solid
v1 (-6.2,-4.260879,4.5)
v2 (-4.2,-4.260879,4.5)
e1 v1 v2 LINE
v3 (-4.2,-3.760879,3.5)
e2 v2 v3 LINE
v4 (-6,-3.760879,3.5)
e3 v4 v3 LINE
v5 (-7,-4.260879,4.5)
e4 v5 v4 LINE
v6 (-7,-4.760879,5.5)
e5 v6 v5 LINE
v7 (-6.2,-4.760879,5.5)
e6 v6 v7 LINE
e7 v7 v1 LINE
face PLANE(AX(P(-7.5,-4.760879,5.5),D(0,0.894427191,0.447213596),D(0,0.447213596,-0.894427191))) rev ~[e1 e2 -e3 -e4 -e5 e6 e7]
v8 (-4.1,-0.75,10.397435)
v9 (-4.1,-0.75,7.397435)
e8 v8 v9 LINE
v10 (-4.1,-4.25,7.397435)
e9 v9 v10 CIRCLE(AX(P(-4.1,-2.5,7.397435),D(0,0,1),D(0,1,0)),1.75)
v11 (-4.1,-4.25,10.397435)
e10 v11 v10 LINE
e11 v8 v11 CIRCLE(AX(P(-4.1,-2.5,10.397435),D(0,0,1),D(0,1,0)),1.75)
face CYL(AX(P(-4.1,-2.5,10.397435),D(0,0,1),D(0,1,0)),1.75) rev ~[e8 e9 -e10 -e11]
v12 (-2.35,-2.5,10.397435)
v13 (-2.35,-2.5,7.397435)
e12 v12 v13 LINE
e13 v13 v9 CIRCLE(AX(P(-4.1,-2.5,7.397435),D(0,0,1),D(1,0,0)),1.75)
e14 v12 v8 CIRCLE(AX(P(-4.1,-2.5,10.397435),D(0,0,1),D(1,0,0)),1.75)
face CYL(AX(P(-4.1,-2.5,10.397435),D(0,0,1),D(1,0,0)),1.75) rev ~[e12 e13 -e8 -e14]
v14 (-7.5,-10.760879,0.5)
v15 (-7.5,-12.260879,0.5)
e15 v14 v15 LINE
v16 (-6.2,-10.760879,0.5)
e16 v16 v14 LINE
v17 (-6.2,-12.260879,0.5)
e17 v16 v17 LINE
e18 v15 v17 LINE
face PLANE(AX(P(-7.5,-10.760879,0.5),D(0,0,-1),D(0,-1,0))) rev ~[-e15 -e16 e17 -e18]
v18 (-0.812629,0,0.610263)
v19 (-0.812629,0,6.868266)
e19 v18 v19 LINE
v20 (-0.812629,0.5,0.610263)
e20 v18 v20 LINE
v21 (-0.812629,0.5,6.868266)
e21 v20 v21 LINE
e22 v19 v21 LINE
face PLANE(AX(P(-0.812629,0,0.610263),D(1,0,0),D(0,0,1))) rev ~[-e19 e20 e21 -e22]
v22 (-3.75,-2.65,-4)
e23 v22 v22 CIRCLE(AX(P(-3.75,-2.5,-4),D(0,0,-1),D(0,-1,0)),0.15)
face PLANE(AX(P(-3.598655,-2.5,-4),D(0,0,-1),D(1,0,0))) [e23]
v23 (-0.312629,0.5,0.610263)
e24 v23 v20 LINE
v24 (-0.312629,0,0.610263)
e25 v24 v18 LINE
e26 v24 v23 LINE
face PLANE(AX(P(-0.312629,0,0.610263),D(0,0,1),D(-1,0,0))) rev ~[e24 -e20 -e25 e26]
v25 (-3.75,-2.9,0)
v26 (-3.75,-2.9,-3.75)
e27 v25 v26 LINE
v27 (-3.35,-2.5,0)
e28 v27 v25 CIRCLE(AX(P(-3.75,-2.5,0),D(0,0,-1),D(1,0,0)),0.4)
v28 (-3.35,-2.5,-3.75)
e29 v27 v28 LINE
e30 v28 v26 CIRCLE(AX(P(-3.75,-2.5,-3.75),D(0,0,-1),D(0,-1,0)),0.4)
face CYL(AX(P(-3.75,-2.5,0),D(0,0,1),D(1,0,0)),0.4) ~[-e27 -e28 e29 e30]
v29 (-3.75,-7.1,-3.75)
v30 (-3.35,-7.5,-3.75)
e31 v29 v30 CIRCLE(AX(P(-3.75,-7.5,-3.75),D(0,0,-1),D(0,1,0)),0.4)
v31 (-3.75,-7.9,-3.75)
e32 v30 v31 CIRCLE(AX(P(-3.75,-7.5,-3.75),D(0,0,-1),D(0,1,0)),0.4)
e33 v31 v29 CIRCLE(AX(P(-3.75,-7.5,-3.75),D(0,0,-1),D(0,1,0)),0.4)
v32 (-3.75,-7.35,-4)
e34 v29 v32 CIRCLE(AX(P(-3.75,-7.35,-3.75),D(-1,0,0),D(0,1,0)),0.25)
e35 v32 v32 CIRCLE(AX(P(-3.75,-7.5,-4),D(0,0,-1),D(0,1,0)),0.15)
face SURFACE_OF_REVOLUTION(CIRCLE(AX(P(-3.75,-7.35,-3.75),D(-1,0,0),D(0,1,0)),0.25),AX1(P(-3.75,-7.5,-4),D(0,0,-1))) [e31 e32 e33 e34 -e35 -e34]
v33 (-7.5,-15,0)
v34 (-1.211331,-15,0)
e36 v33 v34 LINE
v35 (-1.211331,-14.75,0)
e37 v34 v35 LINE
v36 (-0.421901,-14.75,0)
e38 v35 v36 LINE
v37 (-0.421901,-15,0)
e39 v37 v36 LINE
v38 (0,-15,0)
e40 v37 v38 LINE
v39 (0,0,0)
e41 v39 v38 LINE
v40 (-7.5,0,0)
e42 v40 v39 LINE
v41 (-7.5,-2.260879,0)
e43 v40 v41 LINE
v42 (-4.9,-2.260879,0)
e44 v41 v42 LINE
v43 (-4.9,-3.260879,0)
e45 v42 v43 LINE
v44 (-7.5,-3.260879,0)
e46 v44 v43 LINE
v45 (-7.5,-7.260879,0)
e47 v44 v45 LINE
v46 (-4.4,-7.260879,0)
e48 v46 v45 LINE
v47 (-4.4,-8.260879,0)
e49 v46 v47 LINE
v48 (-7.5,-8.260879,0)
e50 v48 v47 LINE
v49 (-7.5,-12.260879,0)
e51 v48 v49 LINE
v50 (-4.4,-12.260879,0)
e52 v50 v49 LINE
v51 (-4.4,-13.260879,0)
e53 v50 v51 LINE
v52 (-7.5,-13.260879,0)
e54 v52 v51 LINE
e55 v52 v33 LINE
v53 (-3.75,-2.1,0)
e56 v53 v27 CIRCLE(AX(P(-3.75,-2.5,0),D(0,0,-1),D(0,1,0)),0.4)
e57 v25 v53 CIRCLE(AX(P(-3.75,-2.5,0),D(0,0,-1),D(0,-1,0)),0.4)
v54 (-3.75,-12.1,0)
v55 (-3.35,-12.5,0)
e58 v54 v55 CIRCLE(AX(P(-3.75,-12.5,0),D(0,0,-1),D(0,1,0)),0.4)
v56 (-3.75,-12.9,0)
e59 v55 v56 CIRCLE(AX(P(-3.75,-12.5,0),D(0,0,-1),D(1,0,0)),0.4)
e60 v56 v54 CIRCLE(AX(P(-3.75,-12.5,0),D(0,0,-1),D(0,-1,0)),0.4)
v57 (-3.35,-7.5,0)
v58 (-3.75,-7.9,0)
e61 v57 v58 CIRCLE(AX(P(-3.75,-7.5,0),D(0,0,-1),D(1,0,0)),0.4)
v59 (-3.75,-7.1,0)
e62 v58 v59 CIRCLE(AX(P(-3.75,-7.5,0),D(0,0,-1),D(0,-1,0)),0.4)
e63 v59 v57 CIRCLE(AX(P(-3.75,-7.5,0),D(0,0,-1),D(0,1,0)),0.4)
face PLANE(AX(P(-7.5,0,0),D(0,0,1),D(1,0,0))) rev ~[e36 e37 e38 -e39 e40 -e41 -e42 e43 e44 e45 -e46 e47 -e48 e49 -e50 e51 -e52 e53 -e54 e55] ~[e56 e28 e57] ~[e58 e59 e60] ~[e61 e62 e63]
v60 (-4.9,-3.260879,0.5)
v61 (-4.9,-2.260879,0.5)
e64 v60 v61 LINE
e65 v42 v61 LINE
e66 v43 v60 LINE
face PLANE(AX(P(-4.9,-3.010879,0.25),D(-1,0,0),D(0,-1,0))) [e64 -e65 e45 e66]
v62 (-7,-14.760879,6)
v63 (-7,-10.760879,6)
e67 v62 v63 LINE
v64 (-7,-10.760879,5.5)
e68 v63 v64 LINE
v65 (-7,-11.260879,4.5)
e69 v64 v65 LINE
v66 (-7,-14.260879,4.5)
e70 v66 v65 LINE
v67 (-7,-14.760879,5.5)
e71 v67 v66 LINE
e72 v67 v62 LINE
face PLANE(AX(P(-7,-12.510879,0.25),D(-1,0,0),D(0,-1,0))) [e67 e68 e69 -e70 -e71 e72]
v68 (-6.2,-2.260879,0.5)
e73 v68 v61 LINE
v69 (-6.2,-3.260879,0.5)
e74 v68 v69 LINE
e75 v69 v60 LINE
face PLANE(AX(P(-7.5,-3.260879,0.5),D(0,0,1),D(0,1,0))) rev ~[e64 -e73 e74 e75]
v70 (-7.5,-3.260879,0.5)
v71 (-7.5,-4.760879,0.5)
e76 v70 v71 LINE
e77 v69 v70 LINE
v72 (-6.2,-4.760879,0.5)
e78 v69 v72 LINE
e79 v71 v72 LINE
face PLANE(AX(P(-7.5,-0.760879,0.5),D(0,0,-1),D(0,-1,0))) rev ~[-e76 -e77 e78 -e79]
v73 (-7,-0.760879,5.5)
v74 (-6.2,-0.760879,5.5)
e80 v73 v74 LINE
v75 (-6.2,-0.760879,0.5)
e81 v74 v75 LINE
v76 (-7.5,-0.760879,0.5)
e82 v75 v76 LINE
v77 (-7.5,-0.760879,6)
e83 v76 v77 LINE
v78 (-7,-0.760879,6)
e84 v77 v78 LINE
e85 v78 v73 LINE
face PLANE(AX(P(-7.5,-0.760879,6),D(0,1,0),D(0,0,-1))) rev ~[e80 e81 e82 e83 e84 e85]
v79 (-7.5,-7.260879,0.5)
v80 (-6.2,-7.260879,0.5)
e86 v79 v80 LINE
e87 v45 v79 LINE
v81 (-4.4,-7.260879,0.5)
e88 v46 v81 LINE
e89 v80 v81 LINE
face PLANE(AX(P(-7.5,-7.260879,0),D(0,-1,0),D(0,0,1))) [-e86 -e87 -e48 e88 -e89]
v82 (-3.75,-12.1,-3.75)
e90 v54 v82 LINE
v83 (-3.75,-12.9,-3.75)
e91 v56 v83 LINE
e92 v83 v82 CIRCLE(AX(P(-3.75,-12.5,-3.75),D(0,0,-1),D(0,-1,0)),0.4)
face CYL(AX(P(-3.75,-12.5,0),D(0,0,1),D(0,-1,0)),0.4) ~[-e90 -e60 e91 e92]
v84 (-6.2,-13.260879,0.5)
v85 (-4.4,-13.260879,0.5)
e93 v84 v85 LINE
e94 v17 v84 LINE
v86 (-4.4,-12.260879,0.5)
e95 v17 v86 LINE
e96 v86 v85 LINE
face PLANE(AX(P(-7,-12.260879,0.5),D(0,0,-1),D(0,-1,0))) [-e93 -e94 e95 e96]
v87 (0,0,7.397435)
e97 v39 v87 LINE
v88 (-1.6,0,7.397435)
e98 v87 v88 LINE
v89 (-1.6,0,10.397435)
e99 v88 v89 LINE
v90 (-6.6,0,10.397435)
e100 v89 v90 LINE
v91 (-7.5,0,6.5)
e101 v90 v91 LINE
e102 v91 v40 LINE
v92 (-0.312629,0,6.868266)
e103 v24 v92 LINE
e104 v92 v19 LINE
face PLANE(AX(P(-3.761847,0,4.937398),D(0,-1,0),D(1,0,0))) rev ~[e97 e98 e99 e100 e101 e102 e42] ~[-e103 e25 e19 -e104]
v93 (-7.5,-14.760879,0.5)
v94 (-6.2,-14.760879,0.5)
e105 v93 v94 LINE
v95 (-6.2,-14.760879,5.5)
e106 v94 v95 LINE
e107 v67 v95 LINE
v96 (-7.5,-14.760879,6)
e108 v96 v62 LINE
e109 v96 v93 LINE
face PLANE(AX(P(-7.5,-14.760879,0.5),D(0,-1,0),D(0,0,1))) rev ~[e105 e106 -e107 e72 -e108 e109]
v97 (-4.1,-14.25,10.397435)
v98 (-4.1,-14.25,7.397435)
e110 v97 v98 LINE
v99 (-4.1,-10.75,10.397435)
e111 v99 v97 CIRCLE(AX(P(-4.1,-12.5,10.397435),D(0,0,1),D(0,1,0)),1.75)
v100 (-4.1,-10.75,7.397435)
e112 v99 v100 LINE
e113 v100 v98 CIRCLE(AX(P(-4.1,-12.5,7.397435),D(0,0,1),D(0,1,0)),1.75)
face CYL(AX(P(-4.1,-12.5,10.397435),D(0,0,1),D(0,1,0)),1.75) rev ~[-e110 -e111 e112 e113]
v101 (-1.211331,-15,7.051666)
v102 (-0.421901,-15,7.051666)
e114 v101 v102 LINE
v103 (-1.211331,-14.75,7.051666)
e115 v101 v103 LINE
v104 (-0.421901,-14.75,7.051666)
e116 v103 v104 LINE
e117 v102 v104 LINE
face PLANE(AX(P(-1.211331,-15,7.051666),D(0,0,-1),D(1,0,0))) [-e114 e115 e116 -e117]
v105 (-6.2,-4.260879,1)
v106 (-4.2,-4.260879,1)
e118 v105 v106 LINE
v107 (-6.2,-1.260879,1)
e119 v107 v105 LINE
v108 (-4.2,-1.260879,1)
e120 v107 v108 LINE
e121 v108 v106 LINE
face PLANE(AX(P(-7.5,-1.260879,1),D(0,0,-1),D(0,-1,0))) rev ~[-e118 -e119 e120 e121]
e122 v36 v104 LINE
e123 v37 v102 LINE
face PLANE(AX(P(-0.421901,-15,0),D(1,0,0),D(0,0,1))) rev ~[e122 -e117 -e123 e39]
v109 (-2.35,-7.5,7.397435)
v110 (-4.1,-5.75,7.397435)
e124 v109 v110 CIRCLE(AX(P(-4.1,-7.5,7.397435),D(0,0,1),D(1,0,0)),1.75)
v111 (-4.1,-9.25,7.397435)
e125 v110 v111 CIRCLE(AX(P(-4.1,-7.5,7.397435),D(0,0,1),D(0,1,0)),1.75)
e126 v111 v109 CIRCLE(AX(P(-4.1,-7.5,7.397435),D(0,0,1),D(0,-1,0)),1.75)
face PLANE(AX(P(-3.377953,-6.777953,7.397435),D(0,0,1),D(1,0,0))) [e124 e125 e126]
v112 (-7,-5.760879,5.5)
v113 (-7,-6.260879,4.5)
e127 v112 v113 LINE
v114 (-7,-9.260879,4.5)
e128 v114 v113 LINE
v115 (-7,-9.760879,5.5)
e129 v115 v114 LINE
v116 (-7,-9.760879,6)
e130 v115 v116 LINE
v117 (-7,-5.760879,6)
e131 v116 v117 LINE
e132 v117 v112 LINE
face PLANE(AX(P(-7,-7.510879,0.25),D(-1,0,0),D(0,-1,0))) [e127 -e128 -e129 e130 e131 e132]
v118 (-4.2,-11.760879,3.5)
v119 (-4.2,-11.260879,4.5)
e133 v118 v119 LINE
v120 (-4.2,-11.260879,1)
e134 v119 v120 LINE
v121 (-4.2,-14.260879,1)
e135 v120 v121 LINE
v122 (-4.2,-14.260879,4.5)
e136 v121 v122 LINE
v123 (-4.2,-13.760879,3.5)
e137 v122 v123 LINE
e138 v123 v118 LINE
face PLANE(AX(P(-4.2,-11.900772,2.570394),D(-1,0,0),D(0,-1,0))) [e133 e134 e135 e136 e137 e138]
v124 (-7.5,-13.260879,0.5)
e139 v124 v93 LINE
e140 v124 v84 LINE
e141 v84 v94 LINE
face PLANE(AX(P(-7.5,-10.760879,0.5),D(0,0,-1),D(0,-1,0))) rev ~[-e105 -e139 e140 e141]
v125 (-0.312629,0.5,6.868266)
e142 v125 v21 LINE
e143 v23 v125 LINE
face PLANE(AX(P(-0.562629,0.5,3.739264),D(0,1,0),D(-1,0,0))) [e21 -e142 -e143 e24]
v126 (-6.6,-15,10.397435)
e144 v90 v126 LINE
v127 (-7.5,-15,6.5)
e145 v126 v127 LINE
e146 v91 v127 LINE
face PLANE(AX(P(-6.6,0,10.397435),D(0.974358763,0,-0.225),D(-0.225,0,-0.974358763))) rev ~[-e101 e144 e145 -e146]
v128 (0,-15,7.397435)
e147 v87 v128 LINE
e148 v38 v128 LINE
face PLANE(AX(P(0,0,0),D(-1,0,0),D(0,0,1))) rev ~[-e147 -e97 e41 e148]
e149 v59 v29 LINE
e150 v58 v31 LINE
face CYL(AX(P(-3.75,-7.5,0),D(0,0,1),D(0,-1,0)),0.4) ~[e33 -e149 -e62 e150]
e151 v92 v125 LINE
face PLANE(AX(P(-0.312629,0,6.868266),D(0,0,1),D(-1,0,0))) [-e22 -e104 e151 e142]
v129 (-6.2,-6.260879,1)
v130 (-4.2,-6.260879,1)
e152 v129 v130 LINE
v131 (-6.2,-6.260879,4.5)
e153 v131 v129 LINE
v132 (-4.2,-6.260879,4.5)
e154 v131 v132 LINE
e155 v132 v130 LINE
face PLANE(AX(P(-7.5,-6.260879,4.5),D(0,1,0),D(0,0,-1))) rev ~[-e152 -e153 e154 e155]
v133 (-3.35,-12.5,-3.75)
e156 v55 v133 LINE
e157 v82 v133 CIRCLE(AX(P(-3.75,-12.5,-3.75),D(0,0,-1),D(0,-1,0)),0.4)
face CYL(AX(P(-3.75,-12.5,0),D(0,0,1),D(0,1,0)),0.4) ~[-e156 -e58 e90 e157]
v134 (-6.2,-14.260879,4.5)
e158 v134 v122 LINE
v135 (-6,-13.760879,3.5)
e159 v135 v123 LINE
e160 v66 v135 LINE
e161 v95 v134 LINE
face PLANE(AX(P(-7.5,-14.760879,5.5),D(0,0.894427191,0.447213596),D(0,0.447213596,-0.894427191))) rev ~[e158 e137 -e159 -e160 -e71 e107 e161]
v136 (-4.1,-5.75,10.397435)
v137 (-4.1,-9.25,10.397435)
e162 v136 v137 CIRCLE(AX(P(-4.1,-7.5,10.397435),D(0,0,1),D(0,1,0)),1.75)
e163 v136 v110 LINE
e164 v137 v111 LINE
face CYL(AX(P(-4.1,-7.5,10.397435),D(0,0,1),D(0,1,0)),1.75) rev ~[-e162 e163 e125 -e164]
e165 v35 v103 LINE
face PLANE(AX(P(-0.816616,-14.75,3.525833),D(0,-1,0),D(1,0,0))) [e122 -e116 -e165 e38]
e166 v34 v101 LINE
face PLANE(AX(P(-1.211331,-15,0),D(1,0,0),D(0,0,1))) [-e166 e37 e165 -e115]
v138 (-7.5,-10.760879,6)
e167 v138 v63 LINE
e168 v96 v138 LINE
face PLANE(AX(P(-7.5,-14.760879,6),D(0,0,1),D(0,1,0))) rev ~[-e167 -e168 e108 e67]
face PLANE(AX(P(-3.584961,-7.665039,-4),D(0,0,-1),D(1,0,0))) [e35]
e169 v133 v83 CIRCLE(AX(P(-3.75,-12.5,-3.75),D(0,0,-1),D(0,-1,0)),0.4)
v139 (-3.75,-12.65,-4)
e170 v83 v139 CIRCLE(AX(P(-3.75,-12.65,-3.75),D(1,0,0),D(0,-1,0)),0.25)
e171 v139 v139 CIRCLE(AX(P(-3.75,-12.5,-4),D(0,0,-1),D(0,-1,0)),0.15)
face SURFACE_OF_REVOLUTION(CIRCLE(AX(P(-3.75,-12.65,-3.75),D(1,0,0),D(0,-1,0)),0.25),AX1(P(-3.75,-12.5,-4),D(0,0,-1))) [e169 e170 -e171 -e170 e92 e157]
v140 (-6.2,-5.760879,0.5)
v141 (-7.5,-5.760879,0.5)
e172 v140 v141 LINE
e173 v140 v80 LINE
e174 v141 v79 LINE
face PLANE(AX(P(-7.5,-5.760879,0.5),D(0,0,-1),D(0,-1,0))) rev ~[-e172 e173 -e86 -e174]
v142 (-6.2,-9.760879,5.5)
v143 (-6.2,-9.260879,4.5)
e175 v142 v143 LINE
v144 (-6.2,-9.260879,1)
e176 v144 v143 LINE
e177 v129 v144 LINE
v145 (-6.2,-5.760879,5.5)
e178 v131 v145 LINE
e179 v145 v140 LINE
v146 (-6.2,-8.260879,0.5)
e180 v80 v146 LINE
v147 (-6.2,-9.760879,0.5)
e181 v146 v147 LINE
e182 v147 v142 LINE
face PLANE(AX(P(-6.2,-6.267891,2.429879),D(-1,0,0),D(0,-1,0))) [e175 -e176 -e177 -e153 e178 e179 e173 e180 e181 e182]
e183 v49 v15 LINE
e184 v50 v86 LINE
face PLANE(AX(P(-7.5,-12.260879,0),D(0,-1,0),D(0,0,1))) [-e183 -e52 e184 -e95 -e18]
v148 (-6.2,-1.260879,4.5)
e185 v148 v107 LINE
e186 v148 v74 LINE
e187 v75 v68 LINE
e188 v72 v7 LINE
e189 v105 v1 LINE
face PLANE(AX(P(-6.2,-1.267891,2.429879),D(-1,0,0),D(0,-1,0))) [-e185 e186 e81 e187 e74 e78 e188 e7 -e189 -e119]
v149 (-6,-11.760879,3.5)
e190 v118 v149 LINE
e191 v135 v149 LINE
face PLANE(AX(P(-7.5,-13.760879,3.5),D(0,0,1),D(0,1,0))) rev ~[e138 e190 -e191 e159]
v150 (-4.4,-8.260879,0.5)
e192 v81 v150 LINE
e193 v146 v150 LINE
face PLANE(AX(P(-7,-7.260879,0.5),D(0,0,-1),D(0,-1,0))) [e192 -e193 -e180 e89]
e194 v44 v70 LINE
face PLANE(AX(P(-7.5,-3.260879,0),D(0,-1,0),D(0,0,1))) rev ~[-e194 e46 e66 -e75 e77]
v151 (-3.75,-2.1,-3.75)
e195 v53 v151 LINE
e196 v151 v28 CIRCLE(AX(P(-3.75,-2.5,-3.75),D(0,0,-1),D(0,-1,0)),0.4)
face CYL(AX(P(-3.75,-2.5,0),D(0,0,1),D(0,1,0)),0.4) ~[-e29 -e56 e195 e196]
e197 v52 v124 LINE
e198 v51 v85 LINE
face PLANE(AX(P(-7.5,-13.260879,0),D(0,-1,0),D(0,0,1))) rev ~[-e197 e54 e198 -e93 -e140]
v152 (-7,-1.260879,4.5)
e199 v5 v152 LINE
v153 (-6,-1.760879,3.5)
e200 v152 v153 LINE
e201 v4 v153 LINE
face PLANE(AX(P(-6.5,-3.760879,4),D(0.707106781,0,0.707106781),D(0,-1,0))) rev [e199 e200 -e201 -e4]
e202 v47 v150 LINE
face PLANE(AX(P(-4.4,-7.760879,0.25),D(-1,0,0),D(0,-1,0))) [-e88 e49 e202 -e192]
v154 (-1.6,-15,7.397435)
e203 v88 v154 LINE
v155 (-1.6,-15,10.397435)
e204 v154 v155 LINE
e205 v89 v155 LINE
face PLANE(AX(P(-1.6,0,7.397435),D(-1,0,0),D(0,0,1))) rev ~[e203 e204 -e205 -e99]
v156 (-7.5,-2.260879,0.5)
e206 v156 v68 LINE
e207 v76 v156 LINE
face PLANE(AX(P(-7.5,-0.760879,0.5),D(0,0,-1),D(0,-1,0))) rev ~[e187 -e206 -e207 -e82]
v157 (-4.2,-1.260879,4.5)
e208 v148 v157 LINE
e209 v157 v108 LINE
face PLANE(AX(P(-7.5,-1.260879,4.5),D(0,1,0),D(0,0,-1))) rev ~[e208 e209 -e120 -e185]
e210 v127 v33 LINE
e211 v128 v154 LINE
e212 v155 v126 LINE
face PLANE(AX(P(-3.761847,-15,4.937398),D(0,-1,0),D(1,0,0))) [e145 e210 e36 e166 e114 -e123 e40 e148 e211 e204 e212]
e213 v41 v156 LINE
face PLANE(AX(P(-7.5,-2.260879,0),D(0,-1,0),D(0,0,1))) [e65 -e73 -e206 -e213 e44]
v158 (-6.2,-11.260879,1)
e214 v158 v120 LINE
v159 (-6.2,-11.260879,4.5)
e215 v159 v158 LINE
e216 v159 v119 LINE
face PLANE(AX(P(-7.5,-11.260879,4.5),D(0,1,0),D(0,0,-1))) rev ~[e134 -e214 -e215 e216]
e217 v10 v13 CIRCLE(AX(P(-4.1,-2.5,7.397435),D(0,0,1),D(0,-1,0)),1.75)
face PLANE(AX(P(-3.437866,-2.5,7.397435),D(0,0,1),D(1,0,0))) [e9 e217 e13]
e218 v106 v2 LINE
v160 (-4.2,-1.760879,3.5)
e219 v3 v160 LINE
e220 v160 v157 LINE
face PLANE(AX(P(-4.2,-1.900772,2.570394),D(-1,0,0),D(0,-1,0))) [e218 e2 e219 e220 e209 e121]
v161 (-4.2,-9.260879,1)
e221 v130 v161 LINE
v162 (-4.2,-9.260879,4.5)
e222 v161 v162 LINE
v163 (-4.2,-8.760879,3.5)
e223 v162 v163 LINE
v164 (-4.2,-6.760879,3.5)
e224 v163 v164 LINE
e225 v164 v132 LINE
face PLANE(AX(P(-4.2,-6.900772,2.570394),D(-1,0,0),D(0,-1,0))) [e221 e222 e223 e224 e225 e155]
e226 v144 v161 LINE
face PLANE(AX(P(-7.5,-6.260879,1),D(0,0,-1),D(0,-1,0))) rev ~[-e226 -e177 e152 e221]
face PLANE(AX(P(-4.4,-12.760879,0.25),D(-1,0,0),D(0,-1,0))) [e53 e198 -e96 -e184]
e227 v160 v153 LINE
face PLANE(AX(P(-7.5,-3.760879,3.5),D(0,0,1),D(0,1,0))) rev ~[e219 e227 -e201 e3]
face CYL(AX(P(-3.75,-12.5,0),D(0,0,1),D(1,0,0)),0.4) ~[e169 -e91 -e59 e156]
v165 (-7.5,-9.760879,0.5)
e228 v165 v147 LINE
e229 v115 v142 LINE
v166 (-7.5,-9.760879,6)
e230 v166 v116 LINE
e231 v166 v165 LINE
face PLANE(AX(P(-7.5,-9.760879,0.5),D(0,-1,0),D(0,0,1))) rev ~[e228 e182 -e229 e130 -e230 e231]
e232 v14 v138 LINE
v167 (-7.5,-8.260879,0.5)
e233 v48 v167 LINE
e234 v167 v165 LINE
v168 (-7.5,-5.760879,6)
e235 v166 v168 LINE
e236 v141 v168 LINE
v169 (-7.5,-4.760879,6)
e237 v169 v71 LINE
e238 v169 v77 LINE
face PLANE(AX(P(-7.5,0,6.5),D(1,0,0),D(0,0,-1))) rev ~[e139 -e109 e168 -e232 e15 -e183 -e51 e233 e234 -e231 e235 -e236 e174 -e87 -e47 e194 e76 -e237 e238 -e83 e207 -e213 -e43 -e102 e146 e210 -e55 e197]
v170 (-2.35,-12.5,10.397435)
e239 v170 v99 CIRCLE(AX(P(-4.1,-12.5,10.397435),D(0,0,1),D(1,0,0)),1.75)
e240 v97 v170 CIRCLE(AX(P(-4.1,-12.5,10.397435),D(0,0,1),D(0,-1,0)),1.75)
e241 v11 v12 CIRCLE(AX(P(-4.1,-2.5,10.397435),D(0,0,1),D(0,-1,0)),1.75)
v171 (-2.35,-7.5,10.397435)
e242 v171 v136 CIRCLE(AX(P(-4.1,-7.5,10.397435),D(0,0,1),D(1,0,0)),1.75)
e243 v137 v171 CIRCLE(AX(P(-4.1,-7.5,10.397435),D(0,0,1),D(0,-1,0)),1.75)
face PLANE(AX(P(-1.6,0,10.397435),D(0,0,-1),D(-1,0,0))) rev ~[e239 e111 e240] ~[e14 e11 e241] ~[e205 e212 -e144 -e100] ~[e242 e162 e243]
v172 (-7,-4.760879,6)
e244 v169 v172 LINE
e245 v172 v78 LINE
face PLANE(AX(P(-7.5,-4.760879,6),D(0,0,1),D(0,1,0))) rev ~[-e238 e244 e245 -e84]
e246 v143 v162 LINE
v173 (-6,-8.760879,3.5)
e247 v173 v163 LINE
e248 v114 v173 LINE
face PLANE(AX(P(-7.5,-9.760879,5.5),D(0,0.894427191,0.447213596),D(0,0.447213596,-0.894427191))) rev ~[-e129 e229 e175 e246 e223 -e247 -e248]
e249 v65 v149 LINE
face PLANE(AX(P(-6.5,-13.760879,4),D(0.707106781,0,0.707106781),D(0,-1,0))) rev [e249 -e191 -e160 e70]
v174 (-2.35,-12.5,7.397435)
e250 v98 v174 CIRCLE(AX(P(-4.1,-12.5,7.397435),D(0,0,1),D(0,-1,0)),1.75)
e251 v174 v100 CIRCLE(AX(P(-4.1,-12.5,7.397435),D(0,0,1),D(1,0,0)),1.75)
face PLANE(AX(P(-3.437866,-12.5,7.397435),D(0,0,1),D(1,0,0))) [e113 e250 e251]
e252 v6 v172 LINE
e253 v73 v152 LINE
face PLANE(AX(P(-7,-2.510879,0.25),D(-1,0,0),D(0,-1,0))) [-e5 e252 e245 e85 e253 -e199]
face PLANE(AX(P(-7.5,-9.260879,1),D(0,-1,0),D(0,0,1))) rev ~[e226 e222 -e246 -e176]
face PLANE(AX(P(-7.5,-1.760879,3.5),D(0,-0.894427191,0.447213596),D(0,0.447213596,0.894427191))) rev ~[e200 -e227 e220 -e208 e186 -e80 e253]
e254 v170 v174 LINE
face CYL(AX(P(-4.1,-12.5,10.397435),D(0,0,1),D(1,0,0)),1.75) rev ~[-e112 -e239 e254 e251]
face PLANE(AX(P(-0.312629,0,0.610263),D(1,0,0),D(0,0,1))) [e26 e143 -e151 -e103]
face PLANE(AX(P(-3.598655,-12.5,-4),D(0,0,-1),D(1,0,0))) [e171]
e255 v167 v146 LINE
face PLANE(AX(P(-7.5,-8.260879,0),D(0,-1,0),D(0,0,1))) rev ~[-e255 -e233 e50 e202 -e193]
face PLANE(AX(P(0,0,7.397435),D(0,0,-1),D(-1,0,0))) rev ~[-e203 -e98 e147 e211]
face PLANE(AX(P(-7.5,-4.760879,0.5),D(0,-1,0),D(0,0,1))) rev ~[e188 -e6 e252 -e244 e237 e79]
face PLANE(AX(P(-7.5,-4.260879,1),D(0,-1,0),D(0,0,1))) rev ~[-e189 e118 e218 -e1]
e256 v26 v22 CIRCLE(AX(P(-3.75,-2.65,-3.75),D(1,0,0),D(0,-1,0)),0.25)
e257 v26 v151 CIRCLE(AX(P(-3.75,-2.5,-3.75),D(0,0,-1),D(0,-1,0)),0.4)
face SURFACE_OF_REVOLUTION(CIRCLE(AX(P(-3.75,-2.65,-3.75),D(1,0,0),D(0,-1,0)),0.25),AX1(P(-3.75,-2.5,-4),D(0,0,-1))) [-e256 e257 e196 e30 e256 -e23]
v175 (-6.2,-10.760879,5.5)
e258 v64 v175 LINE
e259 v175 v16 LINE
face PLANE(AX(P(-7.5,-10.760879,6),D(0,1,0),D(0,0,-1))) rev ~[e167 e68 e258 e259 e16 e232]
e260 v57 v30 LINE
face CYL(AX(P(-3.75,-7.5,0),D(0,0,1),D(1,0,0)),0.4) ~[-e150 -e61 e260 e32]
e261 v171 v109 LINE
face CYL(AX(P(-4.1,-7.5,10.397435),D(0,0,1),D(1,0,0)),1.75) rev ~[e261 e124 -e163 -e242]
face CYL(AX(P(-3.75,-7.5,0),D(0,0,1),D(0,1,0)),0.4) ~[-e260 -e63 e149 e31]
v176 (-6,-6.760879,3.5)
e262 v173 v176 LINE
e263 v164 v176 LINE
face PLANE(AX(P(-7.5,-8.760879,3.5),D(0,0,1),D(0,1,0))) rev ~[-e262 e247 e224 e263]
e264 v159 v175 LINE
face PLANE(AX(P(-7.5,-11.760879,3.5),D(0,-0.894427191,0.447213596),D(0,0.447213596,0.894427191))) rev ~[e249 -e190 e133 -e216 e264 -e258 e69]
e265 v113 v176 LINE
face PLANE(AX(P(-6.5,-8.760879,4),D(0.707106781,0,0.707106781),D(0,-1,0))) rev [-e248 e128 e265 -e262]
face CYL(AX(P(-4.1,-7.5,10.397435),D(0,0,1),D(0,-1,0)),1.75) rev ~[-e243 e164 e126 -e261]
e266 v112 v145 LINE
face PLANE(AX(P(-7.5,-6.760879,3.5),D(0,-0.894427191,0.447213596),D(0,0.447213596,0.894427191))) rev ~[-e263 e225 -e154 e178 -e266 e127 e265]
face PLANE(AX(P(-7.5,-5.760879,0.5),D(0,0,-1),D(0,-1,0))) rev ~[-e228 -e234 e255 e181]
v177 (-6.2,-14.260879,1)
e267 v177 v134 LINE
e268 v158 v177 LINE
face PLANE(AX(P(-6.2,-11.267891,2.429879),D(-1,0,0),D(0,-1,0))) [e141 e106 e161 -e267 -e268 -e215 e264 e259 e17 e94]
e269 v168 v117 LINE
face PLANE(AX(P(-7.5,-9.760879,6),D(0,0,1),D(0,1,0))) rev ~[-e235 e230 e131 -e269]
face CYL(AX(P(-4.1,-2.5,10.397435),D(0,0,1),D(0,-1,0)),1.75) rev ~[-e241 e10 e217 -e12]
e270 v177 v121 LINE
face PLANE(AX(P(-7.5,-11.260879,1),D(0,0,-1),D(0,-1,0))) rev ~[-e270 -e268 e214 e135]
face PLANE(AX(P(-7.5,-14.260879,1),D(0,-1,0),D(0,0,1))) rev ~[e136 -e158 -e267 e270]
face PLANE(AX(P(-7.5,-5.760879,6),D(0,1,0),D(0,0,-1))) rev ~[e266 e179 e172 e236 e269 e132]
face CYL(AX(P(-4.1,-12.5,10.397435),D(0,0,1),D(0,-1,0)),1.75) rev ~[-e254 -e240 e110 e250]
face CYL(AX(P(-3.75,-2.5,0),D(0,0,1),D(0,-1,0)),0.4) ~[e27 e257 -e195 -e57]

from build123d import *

# Parameters (mm, degrees)
F1_DEPTH  = 15
F3_DEPTH  = 3
F4_W      = 0.5
F4_H      = 0.5
F5_DEPTH  = 0.5
F6_DEPTH  = 1.3
F7_DEPTH  = 3.3
F8_SIZE   = 1
F9_W      = 0.7894294686
F9_H      = 7.0516658016
F10_DEPTH = 0.25
F11_W     = 0.5
F11_H     = 6.2580032973
F12_DEPTH = 0.5
F14_DEPTH = 4
F6_FACE_W = 1
F6_FACE_H = 0.5
F16_DEPTH = 2.6


# Not quite as in the source:
# - a fillet or chamfer that OpenCascade refuses, or shapes differently, is made with other operations: its cross-section is extruded or revolved along the edge and cut away or added


with BuildPart() as f1:
    # F0 (on Front) → F1 (new body)
    with BuildSketch(Plane.XZ):
        Polygon((-7.5, 0), (0, 0), (0, 7.397435054), (-1.6, 7.397435054), (-1.6, 10.397435054), (-6.6, 10.397435054), (-7.5, 6.5), align=None)
    extrude(amount=F1_DEPTH)

    # F2 (on face) → F3 (cut)
    with BuildSketch(Plane.XY.offset(10.397435054)):
        with BuildLine():
            ThreePointArc((-2.35, -2.5), (-2.8625631329, -1.2625631329), (-4.1, -0.75))
            Line((-4.1, -0.75), (-4.1, -2.5))
            Line((-4.1, -2.5), (-4.1, -4.25))
            ThreePointArc((-4.1, -4.25), (-2.8625631329, -3.7374368671), (-2.35, -2.5))
        make_face()
        with BuildLine():
            ThreePointArc((-2.35, -12.5), (-2.8625631329, -11.2625631329), (-4.1, -10.75))
            Line((-4.1, -10.75), (-4.1, -14.25))
            ThreePointArc((-4.1, -14.25), (-2.8625631329, -13.7374368671), (-2.35, -12.5))
        make_face()
        with BuildLine():
            Line((-4.1, -14.25), (-4.1, -10.75))
            ThreePointArc((-4.1, -10.75), (-5.85, -12.5), (-4.1, -14.25))
        make_face()
        with BuildLine():
            ThreePointArc((-2.35, -7.5), (-2.8625631329, -6.2625631329), (-4.1, -5.75))
            Line((-4.1, -5.75), (-4.1, -7.5))
            Line((-4.1, -7.5), (-2.35, -7.5))
        make_face()
        with BuildLine():
            Line((-4.1, -7.5), (-4.1, -5.75))
            ThreePointArc((-4.1, -5.75), (-5.85, -7.5), (-4.1, -9.25))
            Line((-4.1, -9.25), (-4.1, -7.5))
        make_face()
        with BuildLine():
            Line((-4.1, -2.5), (-4.1, -0.75))
            ThreePointArc((-4.1, -0.75), (-5.85, -2.5), (-4.1, -4.25))
            Line((-4.1, -4.25), (-4.1, -2.5))
        make_face()
        with BuildLine():
            Line((-2.35, -7.5), (-4.1, -7.5))
            Line((-4.1, -7.5), (-4.1, -9.25))
            ThreePointArc((-4.1, -9.25), (-2.8625631329, -8.7374368671), (-2.35, -7.5))
        make_face()
    extrude(amount=-F3_DEPTH, mode=Mode.SUBTRACT)

    # F4 (on face) → F5 (cut)
    with BuildSketch(Plane(origin=(-7.5, 0, 0), x_dir=(0, -1, 0), z_dir=(-1, 0, 0))):
        with Locations((2.510879118, 0.25)):
            Rectangle(F4_W, F4_H)
        with Locations((12.510879118, 0.25)):
            Rectangle(F4_W, F4_H)
        with Locations((7.510879118, 0.25)):
            Rectangle(F4_W, F4_H)
        with Locations((3.010879118, 0.25)):
            Rectangle(F4_W, F4_H)
        Polygon((0.760879118, 0.5), (2.260879118, 0.5), (2.760879118, 0.5), (2.760879118, 1), (1.260879118, 1), (1.260879118, 4.5), (0.760879118, 5.5), align=None)
        Polygon((2.760879118, 1), (2.760879118, 0.5), (3.260879118, 0.5), (4.760879118, 0.5), (4.760879118, 5.5), (4.260879118, 4.5), (4.260879118, 1), align=None)
        Polygon((0.760879118, 6), (0.760879118, 5.5), (1.260879118, 4.5), (1.760879118, 3.5), (2.760879118, 3.5), (2.760879118, 5.5), (2.760879118, 6), align=None)
        with Locations((8.010879118, 0.25)):
            Rectangle(F4_W, F4_H)
        Polygon((5.760879118, 0.5), (7.260879118, 0.5), (7.760879118, 0.5), (7.760879118, 1), (6.260879118, 1), (6.260879118, 4.5), (5.760879118, 5.5), align=None)
        Polygon((2.760879118, 5.5), (2.760879118, 3.5), (3.760879118, 3.5), (4.260879118, 4.5), (4.760879118, 5.5), (4.760879118, 6), (2.760879118, 6), align=None)
        Polygon((7.760879118, 1), (7.760879118, 0.5), (8.260879118, 0.5), (9.760879118, 0.5), (9.760879118, 5.5), (9.260879118, 4.5), (9.260879118, 1), align=None)
        Polygon((5.760879118, 6), (5.760879118, 5.5), (6.260879118, 4.5), (6.760879118, 3.5), (7.760879118, 3.5), (7.760879118, 5.5), (7.760879118, 6), align=None)
        with Locations((13.010879118, 0.25)):
            Rectangle(F4_W, F4_H)
        Polygon((10.760879118, 0.5), (12.260879118, 0.5), (12.760879118, 0.5), (12.760879118, 1), (11.260879118, 1), (11.260879118, 4.5), (10.760879118, 5.5), align=None)
        Polygon((7.760879118, 5.5), (7.760879118, 3.5), (8.760879118, 3.5), (9.260879118, 4.5), (9.760879118, 5.5), (9.760879118, 6), (7.760879118, 6), align=None)
        Polygon((12.760879118, 1), (12.760879118, 0.5), (13.260879118, 0.5), (14.760879118, 0.5), (14.760879118, 5.5), (14.260879118, 4.5), (14.260879118, 1), align=None)
        Polygon((10.760879118, 6), (10.760879118, 5.5), (11.260879118, 4.5), (11.760879118, 3.5), (12.760879118, 3.5), (12.760879118, 5.5), (12.760879118, 6), align=None)
        Polygon((12.760879118, 5.5), (12.760879118, 3.5), (13.760879118, 3.5), (14.260879118, 4.5), (14.760879118, 5.5), (14.760879118, 6), (12.760879118, 6), align=None)
        Polygon((1.260879118, 1), (2.760879118, 1), (2.760879118, 3.5), (1.760879118, 3.5), (1.260879118, 4.5), align=None)
        Polygon((2.760879118, 3.5), (2.760879118, 1), (4.260879118, 1), (4.260879118, 4.5), (3.760879118, 3.5), align=None)
        Polygon((6.260879118, 1), (7.760879118, 1), (7.760879118, 3.5), (6.760879118, 3.5), (6.260879118, 4.5), align=None)
        Polygon((7.760879118, 3.5), (7.760879118, 1), (9.260879118, 1), (9.260879118, 4.5), (8.760879118, 3.5), align=None)
        Polygon((11.260879118, 1), (12.760879118, 1), (12.760879118, 3.5), (11.760879118, 3.5), (11.260879118, 4.5), align=None)
        Polygon((12.760879118, 3.5), (12.760879118, 1), (14.260879118, 1), (14.260879118, 4.5), (13.760879118, 3.5), align=None)
    extrude(amount=-F5_DEPTH, mode=Mode.SUBTRACT)

    # F4 (on face) → F6 (cut)
    with BuildSketch(Plane(origin=(-7.5, 0, 0), x_dir=(0, -1, 0), z_dir=(-1, 0, 0))):
        Polygon((0.760879118, 0.5), (2.260879118, 0.5), (2.760879118, 0.5), (2.760879118, 1), (1.260879118, 1), (1.260879118, 4.5), (0.760879118, 5.5), align=None)
        Polygon((1.260879118, 1), (2.760879118, 1), (2.760879118, 3.5), (1.760879118, 3.5), (1.260879118, 4.5), align=None)
        Polygon((2.760879118, 3.5), (2.760879118, 1), (4.260879118, 1), (4.260879118, 4.5), (3.760879118, 3.5), align=None)
        Polygon((2.760879118, 1), (2.760879118, 0.5), (3.260879118, 0.5), (4.760879118, 0.5), (4.760879118, 5.5), (4.260879118, 4.5), (4.260879118, 1), align=None)
        Polygon((5.760879118, 0.5), (7.260879118, 0.5), (7.760879118, 0.5), (7.760879118, 1), (6.260879118, 1), (6.260879118, 4.5), (5.760879118, 5.5), align=None)
        Polygon((6.260879118, 1), (7.760879118, 1), (7.760879118, 3.5), (6.760879118, 3.5), (6.260879118, 4.5), align=None)
        Polygon((7.760879118, 3.5), (7.760879118, 1), (9.260879118, 1), (9.260879118, 4.5), (8.760879118, 3.5), align=None)
        Polygon((7.760879118, 1), (7.760879118, 0.5), (8.260879118, 0.5), (9.760879118, 0.5), (9.760879118, 5.5), (9.260879118, 4.5), (9.260879118, 1), align=None)
        Polygon((12.260879118, 0.5), (12.760879118, 0.5), (12.760879118, 1), (11.260879118, 1), (11.260879118, 4.5), (10.760879118, 5.5), (10.760879118, 0.5), align=None)
        Polygon((11.260879118, 1), (12.760879118, 1), (12.760879118, 3.5), (11.760879118, 3.5), (11.260879118, 4.5), align=None)
        Polygon((12.760879118, 3.5), (12.760879118, 1), (14.260879118, 1), (14.260879118, 4.5), (13.760879118, 3.5), align=None)
        Polygon((12.760879118, 0.5), (13.260879118, 0.5), (14.760879118, 0.5), (14.760879118, 5.5), (14.260879118, 4.5), (14.260879118, 1), (12.760879118, 1), align=None)
    extrude(amount=-F6_DEPTH, mode=Mode.SUBTRACT)

    # F4 (on face) → F7 (cut)
    with BuildSketch(Plane(origin=(-7.5, 0, 0), x_dir=(0, -1, 0), z_dir=(-1, 0, 0))):
        Polygon((1.260879118, 1), (2.760879118, 1), (2.760879118, 3.5), (1.760879118, 3.5), (1.260879118, 4.5), align=None)
        Polygon((2.760879118, 3.5), (2.760879118, 1), (4.260879118, 1), (4.260879118, 4.5), (3.760879118, 3.5), align=None)
        Polygon((6.260879118, 1), (7.760879118, 1), (7.760879118, 3.5), (6.760879118, 3.5), (6.260879118, 4.5), align=None)
        Polygon((7.760879118, 3.5), (7.760879118, 1), (9.260879118, 1), (9.260879118, 4.5), (8.760879118, 3.5), align=None)
        Polygon((11.260879118, 1), (12.760879118, 1), (12.760879118, 3.5), (11.760879118, 3.5), (11.260879118, 4.5), align=None)
        Polygon((12.760879118, 3.5), (12.760879118, 1), (14.260879118, 1), (14.260879118, 4.5), (13.760879118, 3.5), align=None)
    extrude(amount=-F7_DEPTH, mode=Mode.SUBTRACT)

    # F8
    f8_edges = [f1.edges().sort_by_distance(p)[0] for p in [
        (-7, -2.760879, 3.5),
        (-7, -7.760879, 3.5),
        (-7, -12.760879, 3.5),
    ]]
    chamfer(f8_edges, length=F8_SIZE)

    # F9 (on face) → F10 (cut)
    with BuildSketch(Plane.XZ.offset(15)):
        with Locations((-0.816616026, 3.5258329008)):
            Rectangle(F9_W, F9_H)
    extrude(amount=-F10_DEPTH, mode=Mode.SUBTRACT)

    # F11 (on face) → F12 (join)
    with BuildSketch(Plane(origin=(0, 0, 0), x_dir=(-1, 0, 0), z_dir=(0, 1, 0))):
        with Locations((0.5626286319, 3.7392643862)):
            Rectangle(F11_W, F11_H)
    extrude(amount=F12_DEPTH)

    # F13 (on face) → F14 (join)
    with BuildSketch(Plane(origin=(0, 0, 0), x_dir=(1, 0, 0), z_dir=(0, 0, -1))):
        with BuildLine():
            ThreePointArc((-3.35, 12.5), (-3.4671572875, 12.7828427125), (-3.75, 12.9))
            Line((-3.75, 12.9), (-3.75, 12.5))
            Line((-3.75, 12.5), (-3.75, 12.1))
            ThreePointArc((-3.75, 12.1), (-3.4671572875, 12.2171572875), (-3.35, 12.5))
        make_face()
        with BuildLine():
            ThreePointArc((-3.35, 2.5), (-3.4671572875, 2.7828427125), (-3.75, 2.9))
            Line((-3.75, 2.9), (-3.75, 2.1))
            ThreePointArc((-3.75, 2.1), (-3.4671572875, 2.2171572875), (-3.35, 2.5))
        make_face()
        with BuildLine():
            Line((-3.75, 2.1), (-3.75, 2.9))
            ThreePointArc((-3.75, 2.9), (-4.15, 2.5), (-3.75, 2.1))
        make_face()
        with BuildLine():
            ThreePointArc((-3.35, 7.5), (-3.4671572875, 7.7828427125), (-3.75, 7.9))
            Line((-3.75, 7.9), (-3.75, 7.5))
            Line((-3.75, 7.5), (-3.35, 7.5))
        make_face()
        with BuildLine():
            Line((-3.75, 7.5), (-3.75, 7.9))
            ThreePointArc((-3.75, 7.9), (-4.15, 7.5), (-3.75, 7.1))
            Line((-3.75, 7.1), (-3.75, 7.5))
        make_face()
        with BuildLine():
            Line((-3.75, 12.5), (-3.75, 12.9))
            ThreePointArc((-3.75, 12.9), (-4.15, 12.5), (-3.75, 12.1))
            Line((-3.75, 12.1), (-3.75, 12.5))
        make_face()
        with BuildLine():
            Line((-3.35, 7.5), (-3.75, 7.5))
            Line((-3.75, 7.5), (-3.75, 7.1))
            ThreePointArc((-3.75, 7.1), (-3.4671572875, 7.2171572875), (-3.35, 7.5))
        make_face()
    extrude(amount=F14_DEPTH)

    # F15: fillet of radius 0.25 on 3 edges, made by hand

    # F15_s1 → F15_t2 (revolve, cut)
    with BuildSketch(Plane.YZ.offset(-3.75)):
        with BuildLine():
            ThreePointArc((-12.9, -3.75), (-12.8267766953, -3.9267766953), (-12.65, -4))
            Line((-12.65, -4), (-12.9, -4))
            Line((-12.9, -4), (-12.9, -3.75))
        make_face()
    revolve(axis=Axis((-3.75, -12.5, -4), (0, 0, -1)), mode=Mode.SUBTRACT)

    # F15_s3 → F15_t4 (revolve, cut)
    with BuildSketch(Plane.YZ.offset(-3.75)):
        with BuildLine():
            ThreePointArc((-7.1, -3.75), (-7.1732233047, -3.9267766953), (-7.35, -4))
            Line((-7.35, -4), (-7.1, -4))
            Line((-7.1, -4), (-7.1, -3.75))
        make_face()
    revolve(axis=Axis((-3.75, -7.5, -4), (0, 0, -1)), mode=Mode.SUBTRACT)

    # F15_s5 → F15_t6 (revolve, cut)
    with BuildSketch(Plane.YZ.offset(-3.75)):
        with BuildLine():
            ThreePointArc((-2.9, -3.75), (-2.8267766953, -3.9267766953), (-2.65, -4))
            Line((-2.65, -4), (-2.9, -4))
            Line((-2.9, -4), (-2.9, -3.75))
        make_face()
    revolve(axis=Axis((-3.75, -2.5, -4), (0, 0, -1)), mode=Mode.SUBTRACT)

    # F6_face (on face) + F4 (on face) → F16 (cut)
    with BuildSketch(Plane(origin=(-7, -12.760879118, 0.25), x_dir=(0, -1, 0), z_dir=(-1, 0, 0))):
        Rectangle(F6_FACE_W, F6_FACE_H)
        with Locations((-5, 0)):
            Rectangle(F6_FACE_W, F6_FACE_H)
    with BuildSketch(Plane(origin=(-7.5, 0, 0), x_dir=(0, -1, 0), z_dir=(-1, 0, 0))):
        with Locations((3.010879118, 0.25)):
            Rectangle(F4_W, F4_H)
        with Locations((2.510879118, 0.25)):
            Rectangle(F4_W, F4_H)
    extrude(amount=-F16_DEPTH, mode=Mode.SUBTRACT)


solid = f1.part
